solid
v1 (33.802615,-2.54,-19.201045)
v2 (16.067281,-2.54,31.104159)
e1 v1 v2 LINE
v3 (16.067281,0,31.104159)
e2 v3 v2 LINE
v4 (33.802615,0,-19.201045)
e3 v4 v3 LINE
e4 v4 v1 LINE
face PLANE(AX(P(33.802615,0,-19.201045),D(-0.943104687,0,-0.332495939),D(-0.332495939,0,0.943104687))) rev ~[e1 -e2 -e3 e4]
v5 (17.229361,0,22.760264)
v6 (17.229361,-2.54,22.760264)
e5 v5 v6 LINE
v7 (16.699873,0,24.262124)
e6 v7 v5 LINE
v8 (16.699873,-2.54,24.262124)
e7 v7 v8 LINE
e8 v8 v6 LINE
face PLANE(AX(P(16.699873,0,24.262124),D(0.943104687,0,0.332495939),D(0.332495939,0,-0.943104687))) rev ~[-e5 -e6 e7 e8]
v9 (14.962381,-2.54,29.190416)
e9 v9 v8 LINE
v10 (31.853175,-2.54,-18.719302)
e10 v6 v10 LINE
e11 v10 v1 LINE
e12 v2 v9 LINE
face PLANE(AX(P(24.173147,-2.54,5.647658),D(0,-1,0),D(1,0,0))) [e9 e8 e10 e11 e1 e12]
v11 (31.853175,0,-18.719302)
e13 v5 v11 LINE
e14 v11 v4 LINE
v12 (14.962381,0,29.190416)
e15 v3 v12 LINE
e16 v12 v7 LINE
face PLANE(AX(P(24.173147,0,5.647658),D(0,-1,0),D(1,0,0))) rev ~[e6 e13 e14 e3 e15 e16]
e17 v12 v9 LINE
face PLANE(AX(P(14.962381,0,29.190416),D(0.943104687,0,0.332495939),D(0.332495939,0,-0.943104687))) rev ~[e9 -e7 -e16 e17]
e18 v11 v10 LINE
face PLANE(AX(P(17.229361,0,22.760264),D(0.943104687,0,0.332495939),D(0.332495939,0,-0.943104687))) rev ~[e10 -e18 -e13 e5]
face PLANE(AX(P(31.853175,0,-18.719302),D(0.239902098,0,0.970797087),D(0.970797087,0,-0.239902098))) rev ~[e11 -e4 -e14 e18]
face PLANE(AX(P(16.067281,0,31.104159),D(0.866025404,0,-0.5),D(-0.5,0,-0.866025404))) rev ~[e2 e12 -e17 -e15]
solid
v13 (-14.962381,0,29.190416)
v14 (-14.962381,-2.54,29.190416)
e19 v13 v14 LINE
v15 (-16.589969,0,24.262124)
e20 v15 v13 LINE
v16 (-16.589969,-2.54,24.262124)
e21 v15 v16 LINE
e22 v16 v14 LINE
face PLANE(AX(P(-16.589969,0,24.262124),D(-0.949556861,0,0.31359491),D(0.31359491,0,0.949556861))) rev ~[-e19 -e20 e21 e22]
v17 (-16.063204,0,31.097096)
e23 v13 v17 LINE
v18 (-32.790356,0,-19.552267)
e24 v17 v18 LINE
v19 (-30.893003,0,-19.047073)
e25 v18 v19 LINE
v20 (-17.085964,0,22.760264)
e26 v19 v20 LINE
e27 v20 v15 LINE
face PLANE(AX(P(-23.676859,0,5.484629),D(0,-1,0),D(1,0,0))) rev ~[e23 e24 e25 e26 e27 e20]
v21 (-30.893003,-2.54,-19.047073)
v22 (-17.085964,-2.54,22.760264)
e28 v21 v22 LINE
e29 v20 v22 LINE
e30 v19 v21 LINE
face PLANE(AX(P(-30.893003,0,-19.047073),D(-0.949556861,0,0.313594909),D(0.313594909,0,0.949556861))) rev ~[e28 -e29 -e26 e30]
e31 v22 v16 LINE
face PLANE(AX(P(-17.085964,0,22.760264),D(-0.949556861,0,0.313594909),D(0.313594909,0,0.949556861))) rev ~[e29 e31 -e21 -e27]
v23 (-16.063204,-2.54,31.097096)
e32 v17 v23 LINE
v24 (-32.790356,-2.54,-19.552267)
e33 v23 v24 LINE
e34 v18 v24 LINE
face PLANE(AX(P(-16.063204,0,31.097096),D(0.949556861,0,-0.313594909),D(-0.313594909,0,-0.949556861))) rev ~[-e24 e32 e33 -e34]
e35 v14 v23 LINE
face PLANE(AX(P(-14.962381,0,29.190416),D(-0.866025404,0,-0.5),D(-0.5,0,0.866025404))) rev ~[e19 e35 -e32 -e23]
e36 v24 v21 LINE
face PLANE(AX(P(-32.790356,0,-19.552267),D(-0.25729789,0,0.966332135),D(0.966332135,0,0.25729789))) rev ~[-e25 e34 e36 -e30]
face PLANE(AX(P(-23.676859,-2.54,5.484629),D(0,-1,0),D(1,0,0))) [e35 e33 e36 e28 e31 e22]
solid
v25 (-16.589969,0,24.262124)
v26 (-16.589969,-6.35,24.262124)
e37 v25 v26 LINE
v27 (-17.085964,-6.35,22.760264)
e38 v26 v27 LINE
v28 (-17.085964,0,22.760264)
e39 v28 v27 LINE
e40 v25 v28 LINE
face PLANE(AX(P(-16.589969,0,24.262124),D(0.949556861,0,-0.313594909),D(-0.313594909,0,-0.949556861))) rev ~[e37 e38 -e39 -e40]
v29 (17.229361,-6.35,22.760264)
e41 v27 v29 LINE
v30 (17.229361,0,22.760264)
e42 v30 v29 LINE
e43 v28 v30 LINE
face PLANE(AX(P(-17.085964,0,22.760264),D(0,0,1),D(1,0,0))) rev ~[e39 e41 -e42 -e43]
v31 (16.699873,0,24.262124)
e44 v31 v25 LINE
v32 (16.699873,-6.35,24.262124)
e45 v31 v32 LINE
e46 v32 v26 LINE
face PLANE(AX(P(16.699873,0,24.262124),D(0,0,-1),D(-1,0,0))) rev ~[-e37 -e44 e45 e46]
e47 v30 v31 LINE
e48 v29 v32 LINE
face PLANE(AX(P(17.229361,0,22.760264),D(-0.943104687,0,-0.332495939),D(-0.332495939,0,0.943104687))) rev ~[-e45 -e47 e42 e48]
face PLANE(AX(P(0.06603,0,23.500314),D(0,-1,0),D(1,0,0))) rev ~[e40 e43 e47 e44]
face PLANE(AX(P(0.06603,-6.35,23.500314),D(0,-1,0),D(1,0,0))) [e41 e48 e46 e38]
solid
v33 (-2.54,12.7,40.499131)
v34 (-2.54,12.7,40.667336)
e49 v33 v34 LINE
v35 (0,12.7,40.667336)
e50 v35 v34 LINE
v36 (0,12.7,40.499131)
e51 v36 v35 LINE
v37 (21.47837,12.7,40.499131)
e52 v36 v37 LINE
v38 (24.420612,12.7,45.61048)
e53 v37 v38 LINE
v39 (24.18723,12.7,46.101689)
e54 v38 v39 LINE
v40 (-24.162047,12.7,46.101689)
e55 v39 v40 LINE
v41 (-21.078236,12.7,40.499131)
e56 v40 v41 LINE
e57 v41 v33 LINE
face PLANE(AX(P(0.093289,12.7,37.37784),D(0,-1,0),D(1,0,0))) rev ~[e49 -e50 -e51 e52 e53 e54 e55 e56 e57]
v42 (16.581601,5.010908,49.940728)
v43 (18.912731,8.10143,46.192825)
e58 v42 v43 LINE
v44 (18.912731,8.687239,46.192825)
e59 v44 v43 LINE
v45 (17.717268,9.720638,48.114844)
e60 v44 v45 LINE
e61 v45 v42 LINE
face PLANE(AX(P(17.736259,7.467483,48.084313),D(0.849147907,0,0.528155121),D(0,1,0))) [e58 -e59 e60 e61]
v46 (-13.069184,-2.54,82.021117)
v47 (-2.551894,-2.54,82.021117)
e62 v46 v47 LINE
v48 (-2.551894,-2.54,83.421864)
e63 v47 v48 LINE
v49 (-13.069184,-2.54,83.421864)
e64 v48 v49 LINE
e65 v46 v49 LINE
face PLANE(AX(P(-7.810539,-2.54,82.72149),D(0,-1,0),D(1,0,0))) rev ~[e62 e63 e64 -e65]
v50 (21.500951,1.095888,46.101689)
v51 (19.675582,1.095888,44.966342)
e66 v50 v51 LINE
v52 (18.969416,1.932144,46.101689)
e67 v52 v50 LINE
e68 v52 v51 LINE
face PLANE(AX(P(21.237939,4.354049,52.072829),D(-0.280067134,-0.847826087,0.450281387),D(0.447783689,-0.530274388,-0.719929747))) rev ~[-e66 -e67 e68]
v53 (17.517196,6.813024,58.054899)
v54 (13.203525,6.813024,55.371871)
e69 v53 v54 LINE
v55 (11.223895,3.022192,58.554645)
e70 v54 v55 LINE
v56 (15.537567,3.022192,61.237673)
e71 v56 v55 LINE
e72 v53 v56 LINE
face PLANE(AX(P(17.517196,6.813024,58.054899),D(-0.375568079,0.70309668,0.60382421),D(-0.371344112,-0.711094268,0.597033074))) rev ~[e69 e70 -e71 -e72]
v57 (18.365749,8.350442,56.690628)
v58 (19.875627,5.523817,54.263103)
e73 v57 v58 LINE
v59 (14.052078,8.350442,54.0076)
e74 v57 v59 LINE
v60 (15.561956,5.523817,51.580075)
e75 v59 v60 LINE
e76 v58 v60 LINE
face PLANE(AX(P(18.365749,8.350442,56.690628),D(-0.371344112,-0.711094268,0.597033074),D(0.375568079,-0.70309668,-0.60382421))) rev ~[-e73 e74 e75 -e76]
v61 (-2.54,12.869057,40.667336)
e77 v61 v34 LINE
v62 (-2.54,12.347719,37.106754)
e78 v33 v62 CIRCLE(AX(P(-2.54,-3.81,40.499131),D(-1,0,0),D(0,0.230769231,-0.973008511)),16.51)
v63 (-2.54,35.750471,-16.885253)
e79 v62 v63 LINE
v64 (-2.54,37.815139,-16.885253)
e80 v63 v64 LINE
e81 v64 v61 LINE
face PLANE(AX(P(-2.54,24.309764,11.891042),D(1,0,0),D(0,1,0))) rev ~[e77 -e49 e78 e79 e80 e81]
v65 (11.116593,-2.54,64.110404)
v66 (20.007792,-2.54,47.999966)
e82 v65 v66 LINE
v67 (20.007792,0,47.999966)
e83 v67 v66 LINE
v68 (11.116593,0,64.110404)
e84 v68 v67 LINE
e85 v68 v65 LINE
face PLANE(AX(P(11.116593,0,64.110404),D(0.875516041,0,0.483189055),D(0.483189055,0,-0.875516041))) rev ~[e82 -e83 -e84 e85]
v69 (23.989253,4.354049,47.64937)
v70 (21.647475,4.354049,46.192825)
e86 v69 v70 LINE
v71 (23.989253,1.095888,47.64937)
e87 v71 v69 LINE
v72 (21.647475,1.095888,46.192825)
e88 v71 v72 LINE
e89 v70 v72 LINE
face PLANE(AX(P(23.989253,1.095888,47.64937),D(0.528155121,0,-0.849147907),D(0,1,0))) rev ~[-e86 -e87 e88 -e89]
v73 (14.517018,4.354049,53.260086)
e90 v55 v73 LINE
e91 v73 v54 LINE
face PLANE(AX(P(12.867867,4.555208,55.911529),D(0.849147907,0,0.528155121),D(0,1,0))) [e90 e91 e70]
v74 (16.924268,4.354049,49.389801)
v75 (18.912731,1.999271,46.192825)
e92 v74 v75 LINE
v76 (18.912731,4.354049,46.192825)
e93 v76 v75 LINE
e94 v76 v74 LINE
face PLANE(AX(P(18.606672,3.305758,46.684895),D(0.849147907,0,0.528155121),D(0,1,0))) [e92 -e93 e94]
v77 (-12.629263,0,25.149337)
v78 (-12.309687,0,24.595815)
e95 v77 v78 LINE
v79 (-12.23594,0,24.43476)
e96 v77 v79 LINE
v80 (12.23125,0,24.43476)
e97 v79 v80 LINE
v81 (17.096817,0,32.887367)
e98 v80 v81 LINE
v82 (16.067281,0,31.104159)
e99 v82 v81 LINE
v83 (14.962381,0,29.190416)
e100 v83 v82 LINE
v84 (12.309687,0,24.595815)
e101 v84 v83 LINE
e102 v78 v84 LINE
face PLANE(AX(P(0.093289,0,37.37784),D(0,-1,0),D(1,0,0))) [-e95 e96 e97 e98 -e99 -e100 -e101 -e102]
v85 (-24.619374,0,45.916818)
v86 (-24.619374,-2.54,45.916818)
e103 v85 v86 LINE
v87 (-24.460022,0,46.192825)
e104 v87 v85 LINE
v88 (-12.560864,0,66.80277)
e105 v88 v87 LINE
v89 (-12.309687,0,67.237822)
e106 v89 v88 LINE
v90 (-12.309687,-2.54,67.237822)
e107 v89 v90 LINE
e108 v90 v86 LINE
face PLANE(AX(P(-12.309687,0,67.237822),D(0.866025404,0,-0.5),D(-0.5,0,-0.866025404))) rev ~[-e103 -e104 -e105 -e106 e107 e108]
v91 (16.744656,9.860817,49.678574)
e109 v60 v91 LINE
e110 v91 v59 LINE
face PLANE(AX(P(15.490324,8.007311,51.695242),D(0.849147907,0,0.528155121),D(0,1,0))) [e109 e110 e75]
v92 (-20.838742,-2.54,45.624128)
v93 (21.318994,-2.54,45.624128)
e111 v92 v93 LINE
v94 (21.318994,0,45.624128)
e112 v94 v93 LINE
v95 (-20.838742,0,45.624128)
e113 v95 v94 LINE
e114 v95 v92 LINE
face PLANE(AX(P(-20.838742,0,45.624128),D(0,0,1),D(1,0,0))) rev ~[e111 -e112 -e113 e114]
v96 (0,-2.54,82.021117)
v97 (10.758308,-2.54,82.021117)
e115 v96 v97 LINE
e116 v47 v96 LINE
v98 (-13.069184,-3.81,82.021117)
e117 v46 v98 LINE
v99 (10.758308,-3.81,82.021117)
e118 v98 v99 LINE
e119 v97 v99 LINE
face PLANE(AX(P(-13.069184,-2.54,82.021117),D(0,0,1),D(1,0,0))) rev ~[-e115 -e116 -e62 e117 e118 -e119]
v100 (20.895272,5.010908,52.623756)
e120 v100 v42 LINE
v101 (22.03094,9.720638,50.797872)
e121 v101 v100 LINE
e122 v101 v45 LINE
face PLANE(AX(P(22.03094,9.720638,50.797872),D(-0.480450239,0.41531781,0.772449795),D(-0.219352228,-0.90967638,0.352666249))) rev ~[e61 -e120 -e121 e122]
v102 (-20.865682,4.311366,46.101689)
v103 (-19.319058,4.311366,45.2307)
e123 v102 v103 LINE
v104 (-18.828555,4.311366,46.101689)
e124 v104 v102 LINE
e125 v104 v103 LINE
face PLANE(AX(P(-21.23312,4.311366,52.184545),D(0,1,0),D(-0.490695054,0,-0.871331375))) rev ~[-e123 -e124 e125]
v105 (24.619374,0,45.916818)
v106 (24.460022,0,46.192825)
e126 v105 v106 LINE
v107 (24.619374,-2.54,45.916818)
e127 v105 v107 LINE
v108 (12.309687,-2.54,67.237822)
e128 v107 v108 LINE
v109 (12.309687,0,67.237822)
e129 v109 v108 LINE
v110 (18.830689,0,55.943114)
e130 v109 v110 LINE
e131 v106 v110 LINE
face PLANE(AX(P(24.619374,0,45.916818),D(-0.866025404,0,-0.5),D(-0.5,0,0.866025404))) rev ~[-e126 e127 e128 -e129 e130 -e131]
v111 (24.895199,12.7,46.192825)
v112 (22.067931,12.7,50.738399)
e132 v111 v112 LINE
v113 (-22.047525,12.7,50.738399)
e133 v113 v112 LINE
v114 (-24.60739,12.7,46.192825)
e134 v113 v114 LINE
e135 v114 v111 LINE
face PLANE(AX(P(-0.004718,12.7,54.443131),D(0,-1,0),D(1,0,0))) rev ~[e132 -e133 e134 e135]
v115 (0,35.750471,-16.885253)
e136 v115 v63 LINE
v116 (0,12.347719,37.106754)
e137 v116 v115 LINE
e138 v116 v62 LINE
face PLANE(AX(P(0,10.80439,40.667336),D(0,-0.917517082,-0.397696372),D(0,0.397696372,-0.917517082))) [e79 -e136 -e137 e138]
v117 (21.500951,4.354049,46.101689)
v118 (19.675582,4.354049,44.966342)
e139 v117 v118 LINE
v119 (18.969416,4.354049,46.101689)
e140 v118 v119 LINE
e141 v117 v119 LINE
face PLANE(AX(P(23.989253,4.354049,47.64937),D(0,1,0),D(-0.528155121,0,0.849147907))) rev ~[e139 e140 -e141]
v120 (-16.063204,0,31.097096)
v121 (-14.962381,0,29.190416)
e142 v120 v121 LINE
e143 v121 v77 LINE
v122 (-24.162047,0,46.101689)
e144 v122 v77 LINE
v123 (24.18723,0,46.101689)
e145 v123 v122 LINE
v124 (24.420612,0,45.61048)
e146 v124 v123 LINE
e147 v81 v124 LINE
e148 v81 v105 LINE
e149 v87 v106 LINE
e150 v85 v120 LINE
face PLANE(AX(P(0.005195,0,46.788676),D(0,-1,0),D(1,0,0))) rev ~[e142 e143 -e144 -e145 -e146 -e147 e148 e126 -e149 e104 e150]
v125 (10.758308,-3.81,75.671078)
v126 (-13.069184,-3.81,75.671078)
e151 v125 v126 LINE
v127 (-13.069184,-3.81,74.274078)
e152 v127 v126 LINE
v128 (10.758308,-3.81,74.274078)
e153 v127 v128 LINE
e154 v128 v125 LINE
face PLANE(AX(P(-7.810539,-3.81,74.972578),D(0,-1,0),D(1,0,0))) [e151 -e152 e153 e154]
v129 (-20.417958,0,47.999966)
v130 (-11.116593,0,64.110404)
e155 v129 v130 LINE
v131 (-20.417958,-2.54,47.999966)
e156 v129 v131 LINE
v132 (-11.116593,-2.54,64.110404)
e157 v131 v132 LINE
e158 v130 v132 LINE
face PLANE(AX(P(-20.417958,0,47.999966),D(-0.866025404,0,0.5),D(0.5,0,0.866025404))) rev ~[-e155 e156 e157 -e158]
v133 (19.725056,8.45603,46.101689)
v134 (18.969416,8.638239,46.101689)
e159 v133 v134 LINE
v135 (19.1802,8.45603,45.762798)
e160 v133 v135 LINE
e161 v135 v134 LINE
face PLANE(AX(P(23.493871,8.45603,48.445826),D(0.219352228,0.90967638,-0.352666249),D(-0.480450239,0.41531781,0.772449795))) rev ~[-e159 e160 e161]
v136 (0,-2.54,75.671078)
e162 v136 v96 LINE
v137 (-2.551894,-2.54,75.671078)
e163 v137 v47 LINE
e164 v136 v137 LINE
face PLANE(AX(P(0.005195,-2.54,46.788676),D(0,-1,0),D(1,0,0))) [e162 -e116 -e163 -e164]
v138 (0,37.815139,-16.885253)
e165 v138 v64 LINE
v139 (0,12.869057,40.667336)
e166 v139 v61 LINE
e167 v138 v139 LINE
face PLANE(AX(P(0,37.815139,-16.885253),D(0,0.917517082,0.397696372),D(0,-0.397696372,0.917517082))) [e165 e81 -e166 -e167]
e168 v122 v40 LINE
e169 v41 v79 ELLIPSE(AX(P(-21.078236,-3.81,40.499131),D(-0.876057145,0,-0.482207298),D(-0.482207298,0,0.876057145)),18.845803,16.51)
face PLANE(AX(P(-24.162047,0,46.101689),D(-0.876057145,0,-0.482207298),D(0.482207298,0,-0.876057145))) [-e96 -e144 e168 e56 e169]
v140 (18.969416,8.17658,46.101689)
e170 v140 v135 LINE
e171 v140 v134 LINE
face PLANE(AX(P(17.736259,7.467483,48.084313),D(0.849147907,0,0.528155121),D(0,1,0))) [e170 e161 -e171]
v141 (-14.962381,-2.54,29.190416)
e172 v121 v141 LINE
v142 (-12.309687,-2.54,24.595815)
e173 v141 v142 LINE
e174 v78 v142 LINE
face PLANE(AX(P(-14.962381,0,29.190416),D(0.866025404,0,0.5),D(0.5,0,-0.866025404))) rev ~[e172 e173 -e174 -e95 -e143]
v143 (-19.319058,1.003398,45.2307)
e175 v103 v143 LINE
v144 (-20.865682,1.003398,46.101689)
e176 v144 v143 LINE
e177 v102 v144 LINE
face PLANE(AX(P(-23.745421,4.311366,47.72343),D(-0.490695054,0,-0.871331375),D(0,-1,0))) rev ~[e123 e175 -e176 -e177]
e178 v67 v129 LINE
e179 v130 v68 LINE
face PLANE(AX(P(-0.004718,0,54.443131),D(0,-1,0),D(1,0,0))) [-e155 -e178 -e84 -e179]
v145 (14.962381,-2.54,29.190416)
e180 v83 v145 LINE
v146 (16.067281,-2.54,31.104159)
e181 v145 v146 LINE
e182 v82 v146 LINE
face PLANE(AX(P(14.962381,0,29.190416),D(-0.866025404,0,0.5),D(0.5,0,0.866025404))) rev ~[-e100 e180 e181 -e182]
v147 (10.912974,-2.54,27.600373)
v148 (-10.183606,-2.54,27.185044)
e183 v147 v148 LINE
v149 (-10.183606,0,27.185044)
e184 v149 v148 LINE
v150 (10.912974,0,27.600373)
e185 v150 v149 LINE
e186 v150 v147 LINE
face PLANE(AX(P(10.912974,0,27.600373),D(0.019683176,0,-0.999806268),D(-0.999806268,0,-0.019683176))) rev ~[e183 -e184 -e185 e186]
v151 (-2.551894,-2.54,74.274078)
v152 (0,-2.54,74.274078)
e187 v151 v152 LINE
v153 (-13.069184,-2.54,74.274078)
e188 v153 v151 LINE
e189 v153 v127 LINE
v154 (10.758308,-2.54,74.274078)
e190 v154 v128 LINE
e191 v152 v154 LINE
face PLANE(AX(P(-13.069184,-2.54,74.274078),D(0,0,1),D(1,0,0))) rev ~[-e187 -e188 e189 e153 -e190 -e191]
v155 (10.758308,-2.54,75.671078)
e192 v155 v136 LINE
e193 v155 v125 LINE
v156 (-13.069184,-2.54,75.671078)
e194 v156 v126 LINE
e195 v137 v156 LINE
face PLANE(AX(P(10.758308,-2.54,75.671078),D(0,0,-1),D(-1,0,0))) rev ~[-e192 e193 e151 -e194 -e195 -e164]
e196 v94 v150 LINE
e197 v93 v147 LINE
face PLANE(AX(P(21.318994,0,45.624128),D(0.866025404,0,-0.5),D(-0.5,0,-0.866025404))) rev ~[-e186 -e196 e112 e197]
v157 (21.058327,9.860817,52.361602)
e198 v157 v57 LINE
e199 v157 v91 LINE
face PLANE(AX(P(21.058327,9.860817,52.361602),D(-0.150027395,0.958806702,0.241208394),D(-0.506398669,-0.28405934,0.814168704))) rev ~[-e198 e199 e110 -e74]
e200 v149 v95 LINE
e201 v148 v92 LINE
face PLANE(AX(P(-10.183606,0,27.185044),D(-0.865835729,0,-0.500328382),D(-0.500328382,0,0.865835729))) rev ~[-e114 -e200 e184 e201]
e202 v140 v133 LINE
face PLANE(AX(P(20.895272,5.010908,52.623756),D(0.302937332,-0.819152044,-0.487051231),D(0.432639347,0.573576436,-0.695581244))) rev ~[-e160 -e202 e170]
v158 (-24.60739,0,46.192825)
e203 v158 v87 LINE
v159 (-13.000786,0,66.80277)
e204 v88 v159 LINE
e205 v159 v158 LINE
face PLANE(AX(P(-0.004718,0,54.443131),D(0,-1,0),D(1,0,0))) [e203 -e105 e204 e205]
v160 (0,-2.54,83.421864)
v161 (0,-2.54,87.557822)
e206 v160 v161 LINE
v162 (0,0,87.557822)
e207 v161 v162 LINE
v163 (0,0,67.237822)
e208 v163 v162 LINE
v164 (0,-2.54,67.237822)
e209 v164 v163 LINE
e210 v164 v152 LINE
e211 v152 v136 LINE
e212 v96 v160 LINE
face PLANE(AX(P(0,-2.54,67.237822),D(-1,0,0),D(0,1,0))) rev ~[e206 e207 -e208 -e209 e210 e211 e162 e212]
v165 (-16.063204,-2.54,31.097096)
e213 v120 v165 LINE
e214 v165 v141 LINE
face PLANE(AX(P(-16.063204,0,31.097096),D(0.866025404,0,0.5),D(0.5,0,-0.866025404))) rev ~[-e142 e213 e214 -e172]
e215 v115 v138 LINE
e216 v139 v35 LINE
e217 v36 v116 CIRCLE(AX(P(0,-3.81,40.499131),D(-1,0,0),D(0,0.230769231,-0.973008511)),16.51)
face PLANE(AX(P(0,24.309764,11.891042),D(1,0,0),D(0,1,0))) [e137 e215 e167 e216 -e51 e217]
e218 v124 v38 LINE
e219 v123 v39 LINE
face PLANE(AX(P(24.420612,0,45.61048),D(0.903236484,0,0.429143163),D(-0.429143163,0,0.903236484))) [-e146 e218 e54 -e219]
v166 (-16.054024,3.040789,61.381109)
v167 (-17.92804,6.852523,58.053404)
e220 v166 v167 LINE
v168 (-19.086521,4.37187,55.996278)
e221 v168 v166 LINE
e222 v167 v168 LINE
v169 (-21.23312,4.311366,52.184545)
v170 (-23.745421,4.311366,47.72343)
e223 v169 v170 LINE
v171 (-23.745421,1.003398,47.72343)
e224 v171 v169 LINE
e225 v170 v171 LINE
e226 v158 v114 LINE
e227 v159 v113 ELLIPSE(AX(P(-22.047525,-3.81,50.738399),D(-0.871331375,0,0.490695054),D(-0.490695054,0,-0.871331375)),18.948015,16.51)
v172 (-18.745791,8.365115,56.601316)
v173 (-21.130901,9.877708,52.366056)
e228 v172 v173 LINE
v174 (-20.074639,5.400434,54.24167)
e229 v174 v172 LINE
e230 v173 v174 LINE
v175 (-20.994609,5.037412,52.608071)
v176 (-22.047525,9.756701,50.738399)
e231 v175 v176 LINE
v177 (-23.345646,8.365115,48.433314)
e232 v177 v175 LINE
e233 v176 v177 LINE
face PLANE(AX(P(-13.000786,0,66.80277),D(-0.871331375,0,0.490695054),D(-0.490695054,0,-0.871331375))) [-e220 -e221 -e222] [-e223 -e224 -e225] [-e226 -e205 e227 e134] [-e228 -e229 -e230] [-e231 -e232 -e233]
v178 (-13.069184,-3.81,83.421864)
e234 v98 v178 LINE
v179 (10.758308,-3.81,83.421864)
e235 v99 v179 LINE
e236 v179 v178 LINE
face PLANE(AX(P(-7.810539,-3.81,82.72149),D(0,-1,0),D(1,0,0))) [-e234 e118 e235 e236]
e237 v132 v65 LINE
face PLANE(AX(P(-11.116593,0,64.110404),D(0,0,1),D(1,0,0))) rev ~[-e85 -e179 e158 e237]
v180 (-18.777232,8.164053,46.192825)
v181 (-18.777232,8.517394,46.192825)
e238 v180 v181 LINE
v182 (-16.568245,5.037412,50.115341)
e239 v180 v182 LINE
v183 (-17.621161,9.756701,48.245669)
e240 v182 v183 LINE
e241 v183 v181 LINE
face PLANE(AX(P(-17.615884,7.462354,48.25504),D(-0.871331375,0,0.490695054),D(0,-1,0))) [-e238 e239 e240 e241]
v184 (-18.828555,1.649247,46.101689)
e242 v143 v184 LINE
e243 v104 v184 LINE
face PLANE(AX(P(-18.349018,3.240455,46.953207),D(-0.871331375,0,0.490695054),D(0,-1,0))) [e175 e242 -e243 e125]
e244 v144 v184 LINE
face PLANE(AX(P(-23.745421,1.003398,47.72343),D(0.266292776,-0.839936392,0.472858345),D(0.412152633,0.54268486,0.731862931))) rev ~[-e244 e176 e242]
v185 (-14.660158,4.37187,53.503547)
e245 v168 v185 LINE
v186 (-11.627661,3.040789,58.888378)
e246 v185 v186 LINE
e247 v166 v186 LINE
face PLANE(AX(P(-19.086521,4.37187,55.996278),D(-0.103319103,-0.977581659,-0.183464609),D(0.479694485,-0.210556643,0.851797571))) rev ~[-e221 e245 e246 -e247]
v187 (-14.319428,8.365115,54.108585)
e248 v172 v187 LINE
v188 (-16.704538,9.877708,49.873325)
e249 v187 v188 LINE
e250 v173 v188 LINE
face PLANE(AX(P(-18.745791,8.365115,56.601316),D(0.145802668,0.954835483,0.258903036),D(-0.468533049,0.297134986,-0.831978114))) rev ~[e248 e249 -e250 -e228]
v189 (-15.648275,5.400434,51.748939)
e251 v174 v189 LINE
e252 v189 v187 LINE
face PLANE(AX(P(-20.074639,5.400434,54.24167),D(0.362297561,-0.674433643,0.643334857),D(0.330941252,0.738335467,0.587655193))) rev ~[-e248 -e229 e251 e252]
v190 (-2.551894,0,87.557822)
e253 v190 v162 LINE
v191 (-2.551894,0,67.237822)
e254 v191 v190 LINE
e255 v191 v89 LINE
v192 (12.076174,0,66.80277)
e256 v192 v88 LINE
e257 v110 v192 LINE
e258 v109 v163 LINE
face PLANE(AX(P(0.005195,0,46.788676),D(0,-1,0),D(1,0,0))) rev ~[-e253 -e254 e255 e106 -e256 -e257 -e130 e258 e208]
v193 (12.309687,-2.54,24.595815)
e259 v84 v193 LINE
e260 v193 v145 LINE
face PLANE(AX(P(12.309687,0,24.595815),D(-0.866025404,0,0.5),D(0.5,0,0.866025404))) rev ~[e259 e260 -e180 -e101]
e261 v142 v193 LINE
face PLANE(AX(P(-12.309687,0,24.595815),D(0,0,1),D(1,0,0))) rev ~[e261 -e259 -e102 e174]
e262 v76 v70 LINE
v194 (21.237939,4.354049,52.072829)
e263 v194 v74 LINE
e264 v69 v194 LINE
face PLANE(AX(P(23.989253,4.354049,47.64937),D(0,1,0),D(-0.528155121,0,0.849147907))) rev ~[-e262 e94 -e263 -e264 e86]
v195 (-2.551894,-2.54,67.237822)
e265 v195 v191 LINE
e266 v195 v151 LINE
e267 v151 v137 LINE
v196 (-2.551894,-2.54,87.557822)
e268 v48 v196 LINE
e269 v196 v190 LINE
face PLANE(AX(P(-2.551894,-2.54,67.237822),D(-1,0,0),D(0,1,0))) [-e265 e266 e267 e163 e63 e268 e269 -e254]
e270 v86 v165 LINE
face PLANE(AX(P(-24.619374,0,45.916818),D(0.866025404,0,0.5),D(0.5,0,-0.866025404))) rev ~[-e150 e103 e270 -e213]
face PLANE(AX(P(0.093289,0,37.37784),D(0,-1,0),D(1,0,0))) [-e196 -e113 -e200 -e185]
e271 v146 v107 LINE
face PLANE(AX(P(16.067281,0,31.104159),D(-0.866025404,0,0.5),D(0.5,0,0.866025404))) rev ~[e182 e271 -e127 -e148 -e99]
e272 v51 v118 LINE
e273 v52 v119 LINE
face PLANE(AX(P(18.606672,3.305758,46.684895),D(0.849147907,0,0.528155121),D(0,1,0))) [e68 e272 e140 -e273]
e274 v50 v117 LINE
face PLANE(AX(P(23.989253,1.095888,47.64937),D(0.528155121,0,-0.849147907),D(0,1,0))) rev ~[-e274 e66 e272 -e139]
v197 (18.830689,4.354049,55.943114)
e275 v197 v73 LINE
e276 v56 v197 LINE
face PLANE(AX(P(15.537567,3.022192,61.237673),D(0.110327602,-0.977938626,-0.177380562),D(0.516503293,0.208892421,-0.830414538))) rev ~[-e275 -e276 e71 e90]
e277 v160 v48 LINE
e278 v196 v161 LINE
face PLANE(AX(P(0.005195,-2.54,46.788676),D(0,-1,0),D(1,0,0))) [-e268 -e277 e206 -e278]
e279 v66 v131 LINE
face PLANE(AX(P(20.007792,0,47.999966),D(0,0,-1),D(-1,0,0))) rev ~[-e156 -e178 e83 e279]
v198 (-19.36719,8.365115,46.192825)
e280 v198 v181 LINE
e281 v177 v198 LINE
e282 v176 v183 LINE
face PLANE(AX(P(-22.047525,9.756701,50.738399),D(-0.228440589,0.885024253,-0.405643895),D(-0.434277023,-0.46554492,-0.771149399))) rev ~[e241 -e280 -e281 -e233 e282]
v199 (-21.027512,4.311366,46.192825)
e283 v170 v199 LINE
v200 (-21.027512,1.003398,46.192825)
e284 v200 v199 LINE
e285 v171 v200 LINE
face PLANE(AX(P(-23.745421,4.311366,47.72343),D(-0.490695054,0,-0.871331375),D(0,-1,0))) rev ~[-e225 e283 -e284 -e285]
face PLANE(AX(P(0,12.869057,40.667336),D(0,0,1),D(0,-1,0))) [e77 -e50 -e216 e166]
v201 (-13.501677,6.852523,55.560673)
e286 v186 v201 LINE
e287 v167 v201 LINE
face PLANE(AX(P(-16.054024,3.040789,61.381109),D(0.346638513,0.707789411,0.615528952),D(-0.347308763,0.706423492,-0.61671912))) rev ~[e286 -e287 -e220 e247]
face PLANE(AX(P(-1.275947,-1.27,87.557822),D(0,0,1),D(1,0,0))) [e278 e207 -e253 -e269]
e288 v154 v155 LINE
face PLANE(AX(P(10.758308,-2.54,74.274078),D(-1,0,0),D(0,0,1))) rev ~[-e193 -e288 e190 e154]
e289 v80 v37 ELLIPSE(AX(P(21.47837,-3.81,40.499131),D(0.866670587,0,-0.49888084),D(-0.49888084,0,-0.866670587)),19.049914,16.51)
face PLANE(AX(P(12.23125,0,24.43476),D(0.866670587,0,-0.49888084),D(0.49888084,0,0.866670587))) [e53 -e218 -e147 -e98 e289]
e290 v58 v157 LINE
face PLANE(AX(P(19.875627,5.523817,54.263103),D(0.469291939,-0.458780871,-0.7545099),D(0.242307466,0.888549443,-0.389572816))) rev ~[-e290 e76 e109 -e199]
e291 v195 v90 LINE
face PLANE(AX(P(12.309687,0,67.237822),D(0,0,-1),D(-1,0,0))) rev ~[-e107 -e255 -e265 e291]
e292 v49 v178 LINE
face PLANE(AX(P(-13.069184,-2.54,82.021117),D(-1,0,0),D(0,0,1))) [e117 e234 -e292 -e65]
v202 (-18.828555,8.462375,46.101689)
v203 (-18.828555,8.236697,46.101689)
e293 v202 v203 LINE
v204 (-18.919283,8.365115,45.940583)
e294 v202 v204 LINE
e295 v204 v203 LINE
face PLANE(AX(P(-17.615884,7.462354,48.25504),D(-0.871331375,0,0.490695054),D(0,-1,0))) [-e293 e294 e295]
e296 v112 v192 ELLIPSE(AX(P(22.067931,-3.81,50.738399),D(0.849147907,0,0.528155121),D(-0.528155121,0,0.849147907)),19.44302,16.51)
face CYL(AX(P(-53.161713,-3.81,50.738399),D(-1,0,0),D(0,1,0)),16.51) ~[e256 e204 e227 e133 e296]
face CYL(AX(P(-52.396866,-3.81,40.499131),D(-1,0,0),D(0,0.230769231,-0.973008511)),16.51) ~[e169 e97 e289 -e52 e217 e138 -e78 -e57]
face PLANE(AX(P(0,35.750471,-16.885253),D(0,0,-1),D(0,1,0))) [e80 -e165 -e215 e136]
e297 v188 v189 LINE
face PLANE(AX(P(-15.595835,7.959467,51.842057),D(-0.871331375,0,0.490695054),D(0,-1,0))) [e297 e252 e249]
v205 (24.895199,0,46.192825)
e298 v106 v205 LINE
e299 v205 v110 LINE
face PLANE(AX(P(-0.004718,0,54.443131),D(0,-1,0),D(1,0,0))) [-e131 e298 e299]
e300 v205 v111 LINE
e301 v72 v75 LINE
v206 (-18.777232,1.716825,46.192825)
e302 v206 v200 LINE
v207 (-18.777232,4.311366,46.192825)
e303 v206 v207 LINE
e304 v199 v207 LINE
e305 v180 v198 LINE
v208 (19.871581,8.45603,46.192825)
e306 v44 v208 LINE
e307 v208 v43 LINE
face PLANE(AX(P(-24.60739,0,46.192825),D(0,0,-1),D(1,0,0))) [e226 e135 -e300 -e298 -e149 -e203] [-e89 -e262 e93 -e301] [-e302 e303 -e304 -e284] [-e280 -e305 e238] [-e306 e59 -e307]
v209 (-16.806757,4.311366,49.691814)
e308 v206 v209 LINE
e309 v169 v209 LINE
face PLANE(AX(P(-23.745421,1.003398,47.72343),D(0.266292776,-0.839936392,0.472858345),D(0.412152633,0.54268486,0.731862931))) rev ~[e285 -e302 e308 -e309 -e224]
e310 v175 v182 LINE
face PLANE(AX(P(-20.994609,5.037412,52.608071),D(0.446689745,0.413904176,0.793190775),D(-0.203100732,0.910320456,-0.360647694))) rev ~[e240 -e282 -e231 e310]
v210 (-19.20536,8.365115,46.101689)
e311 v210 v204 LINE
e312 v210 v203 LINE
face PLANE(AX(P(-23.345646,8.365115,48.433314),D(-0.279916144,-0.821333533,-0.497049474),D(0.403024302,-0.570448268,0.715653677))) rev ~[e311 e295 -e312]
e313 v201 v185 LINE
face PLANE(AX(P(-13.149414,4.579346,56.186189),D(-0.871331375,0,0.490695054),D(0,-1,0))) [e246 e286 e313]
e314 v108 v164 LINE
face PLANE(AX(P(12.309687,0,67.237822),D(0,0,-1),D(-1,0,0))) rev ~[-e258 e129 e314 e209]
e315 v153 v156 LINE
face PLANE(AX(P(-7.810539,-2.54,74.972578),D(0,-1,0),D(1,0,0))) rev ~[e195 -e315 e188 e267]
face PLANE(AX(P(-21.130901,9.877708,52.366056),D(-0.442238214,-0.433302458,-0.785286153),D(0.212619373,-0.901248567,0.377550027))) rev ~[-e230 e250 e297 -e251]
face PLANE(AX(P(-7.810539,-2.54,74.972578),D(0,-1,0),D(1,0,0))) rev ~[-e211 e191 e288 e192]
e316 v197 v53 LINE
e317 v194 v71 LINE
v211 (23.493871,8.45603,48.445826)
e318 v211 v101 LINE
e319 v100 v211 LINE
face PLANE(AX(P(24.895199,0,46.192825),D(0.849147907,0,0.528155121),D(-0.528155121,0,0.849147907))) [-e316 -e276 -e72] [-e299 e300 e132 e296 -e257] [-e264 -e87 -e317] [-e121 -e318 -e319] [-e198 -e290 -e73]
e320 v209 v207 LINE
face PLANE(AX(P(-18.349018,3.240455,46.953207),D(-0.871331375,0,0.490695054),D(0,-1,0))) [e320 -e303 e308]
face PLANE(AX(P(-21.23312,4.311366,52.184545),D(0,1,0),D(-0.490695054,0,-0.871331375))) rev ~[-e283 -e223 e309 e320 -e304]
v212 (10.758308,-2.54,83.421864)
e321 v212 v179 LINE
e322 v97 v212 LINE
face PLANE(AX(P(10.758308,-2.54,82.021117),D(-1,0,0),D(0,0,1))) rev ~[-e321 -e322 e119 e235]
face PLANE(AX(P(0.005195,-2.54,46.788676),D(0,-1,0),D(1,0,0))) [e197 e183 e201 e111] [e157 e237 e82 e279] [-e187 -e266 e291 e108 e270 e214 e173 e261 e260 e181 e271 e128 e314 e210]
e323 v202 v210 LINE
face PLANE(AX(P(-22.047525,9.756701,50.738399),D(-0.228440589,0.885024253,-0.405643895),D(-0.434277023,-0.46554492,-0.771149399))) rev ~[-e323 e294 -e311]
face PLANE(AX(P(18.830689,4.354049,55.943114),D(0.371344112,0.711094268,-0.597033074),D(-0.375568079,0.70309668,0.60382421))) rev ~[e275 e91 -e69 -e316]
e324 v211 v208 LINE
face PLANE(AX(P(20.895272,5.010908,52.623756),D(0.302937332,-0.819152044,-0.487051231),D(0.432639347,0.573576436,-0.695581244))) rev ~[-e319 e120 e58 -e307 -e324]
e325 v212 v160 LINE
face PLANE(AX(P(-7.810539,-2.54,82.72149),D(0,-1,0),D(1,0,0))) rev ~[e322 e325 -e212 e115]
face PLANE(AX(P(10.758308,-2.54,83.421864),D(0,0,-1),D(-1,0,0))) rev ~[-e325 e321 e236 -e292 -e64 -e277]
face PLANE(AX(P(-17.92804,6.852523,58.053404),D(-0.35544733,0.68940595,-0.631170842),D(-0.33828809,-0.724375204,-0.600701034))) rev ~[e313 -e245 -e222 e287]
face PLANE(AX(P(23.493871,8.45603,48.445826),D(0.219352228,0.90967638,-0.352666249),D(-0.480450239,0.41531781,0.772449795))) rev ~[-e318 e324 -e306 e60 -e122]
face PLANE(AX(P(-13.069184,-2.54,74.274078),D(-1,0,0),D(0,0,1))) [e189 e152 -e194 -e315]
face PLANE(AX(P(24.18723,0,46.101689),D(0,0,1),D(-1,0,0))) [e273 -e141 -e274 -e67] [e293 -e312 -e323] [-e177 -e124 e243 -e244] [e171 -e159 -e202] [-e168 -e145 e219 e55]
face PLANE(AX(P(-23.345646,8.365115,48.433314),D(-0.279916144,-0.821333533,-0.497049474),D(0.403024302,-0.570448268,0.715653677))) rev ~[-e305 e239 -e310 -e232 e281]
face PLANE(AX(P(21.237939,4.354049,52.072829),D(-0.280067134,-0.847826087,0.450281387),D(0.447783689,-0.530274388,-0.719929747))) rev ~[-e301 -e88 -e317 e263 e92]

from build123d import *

# Parameters (mm, degrees)
F1_DEPTH    = 2.54
F2_DEPTH    = 6.35
F3_DEPTH    = 2.54
F5_DEPTH    = 12.7
F6_T1_DEPTH = 64.7979646342
F6_T3_DEPTH = 40.6008481475
F8_DEPTH    = 12.7
F9_T1_DEPTH = 104.7890423645
F12_DEPTH   = 2.54
F13_DEPTH   = 5.08
F14_DEPTH   = 5.08
F16_DEPTH   = 2.54
F17_W       = 2.5518944021
F17_H       = 2.54
F18_DEPTH   = 20.32
F19_W       = 10.5172891635
F19_H       = 1.4007464051
F19_W_2     = 10.7583077624
F19_W_3     = 2.5518944021
F19_H_2     = 1.397
F20_DEPTH   = 1.27


# Not quite as in the source:
# - a fillet or chamfer that OpenCascade refuses, or shapes differently, is made with other operations: its cross-section is extruded or revolved along the edge and cut away or added
# - a feature names something its author has since deleted; it is built from what else it names


with BuildPart() as f1:
    # F0 (on Front) → F1 (new body)
    with BuildSketch(Plane.XZ):
        Polygon((-12.3096870905, 24.5958147295), (12.3096870905, 24.5958147295), (14.9623812482, 29.1904157876), (16.0672812482, 31.1041587249), (24.619374181, 45.9168181956), (12.3096870905, 67.2378216616), (-12.3096870905, 67.2378216616), (-24.619374181, 45.9168181956), (-16.063203778, 31.0970963393), (-14.9623812482, 29.1904157876), align=None)
        Polygon((-20.4179584605, 47.9999661041), (-11.1165930793, 64.1104035241), (11.1165930793, 64.1104035241), (20.0077917219, 47.9999661041), (21.3189943773, 45.6241280226), (10.9129743139, 27.6003725681), (-10.1836063763, 27.1850443882), (-20.8387417213, 45.6241280226), (-21.3144036201, 46.4472775415), align=None, mode=Mode.SUBTRACT)
    extrude(amount=F1_DEPTH)

    # F0 (on Front) → F3 (join)
    with BuildSketch(Plane.XZ):
        Polygon((20.0077917219, 47.9999661041), (-20.4179584605, 47.9999661041), (-21.3144036201, 46.4472775415), (-20.8387417213, 45.6241280226), (21.3189943773, 45.6241280226), align=None)
    extrude(amount=F3_DEPTH)

    # F4 (on Front) → F5 (join)
    with BuildSketch(Plane.XZ):
        Polygon((-24.6073901653, 46.1928248405), (24.8951986432, 46.1928248405), (12.076173909, 66.8027698994), (-13.0007863045, 66.8027698994), align=None)
    extrude(amount=-F5_DEPTH)

    # F6: fillet of radius 16.51 on 1 edges, made by hand

    # F6_s2 → F6_t1 (cut)
    with BuildSketch(Plane.YZ.offset(-12.5608644411)):
        with BuildLine():
            ThreePointArc((12.7, 50.7383993857), (9.1415095645, 60.9774667261), (0, 66.8027698994))
            Line((0, 66.8027698994), (12.7, 66.8027698994))
            Line((12.7, 66.8027698994), (12.7, 50.7383993857))
        make_face()
    extrude(amount=F6_T1_DEPTH, mode=Mode.SUBTRACT)

    # F6_s4 → F6_t3 (cut)
    with BuildSketch(Plane.YZ.offset(-53.1617125886)):
        with BuildLine():
            ThreePointArc((12.7, 50.7383993857), (9.1415095645, 60.9774667261), (0, 66.8027698994))
            Line((0, 66.8027698994), (12.7, 66.8027698994))
            Line((12.7, 66.8027698994), (12.7, 50.7383993857))
        make_face()
    extrude(amount=F6_T3_DEPTH, mode=Mode.SUBTRACT)

    # F7 (on face) → F8 (join)
    with BuildSketch(Plane.XZ):
        Polygon((24.1872295737, 46.1016893387), (-24.1620466113, 46.1016893387), (-12.2359395027, 24.4347602129), (12.2312502936, 24.4347602129), (24.4206115603, 45.6104800105), align=None)
    extrude(amount=-F8_DEPTH)

    # F9: fillet of radius 16.51 on 1 edges, made by hand

    # F9_s2 → F9_t1 (cut)
    with BuildSketch(Plane.YZ.offset(-52.3968657869)):
        with BuildLine():
            ThreePointArc((0, 24.4347602129), (9.1415095645, 30.2600633862), (12.7, 40.4991307266))
            Line((12.7, 40.4991307266), (12.7, 24.4347602129))
            Line((12.7, 24.4347602129), (0, 24.4347602129))
        make_face()
    extrude(amount=F9_T1_DEPTH, mode=Mode.SUBTRACT)

    # F11 (on face) + F10 (on face) → F13 (cut)
    with BuildSketch(Plane(origin=(-38.4324941113, 0, 21.6434703373), x_dir=(0, -1, 0), z_dir=(-0.8713313746, 0, 0.4906950536))):
        Polygon((-4.3718703091, 39.4256524742), (-3.040788928, 45.6056557596), (-6.8525229581, 41.7865514755), align=None)
        Polygon((-5.4004341364, 37.411943078), (-8.3651151508, 40.1200354099), (-9.8777078092, 35.2593585849), align=None)
        Polygon((-5.0374120474, 35.5371125042), (-9.7567010671, 33.3913478812), (-8.3651151508, 30.7458732277), align=None)
        Polygon((-1.0033984436, 29.9311615527), (-4.3113664724, 35.0510440767), (-4.3113664724, 29.9311615527), align=None)
    with BuildSketch(Plane(origin=(38.6673789122, 0, 24.0504322194), x_dir=(0, 1, 0), z_dir=(0.8491479072, 0, 0.5281551209))):
        Polygon((6.8130241707, 40.0453992188), (3.022192046, 43.7935963273), (4.3540487314, 37.5584534102), align=None)
        Polygon((4.3540487314, 27.7913156897), (4.3540487314, 33.0006070435), (1.0958878556, 27.7913156897), align=None)
        Polygon((9.7206383943, 31.4991533315), (5.0109082768, 33.6494068058), (8.4560297574, 28.7292634302), align=None)
        Polygon((9.860817343, 33.3406813443), (8.3504421636, 38.4387634695), (5.5238169231, 35.5799859143), align=None)
    extrude(amount=-F13_DEPTH, dir=(-0.8713313746, 0, 0.4906950536), mode=Mode.SUBTRACT)

    # F10 (on face) → F14 (cut)
    with BuildSketch(Plane(origin=(38.6673789122, 0, 24.0504322194), x_dir=(0, 1, 0), z_dir=(0.8491479072, 0, 0.5281551209))):
        Polygon((9.860817343, 33.3406813443), (8.3504421636, 38.4387634695), (5.5238169231, 35.5799859143), align=None)
        Polygon((9.7206383943, 31.4991533315), (5.0109082768, 33.6494068058), (8.4560297574, 28.7292634302), align=None)
        Polygon((4.3540487314, 27.7913156897), (4.3540487314, 33.0006070435), (1.0958878556, 27.7913156897), align=None)
        Polygon((6.8130241707, 40.0453992188), (3.022192046, 43.7935963273), (4.3540487314, 37.5584534102), align=None)
    extrude(amount=-F14_DEPTH, mode=Mode.SUBTRACT)

    # F15 (on Right) → F16 (join)
    with BuildSketch(Plane.YZ):
        Polygon((37.8151386976, -16.8852526695), (12.8690572456, 40.6673364341), (10.8043896034, 40.6673364341), (35.7504710555, -16.8852526695), align=None)
    extrude(amount=-F16_DEPTH)

    # F17 (on face) → F18 (join)
    with BuildSketch(Plane.XY.offset(67.2378216616)):
        with Locations((-1.2759472011, -1.27)):
            Rectangle(F17_W, F17_H)
    extrude(amount=F18_DEPTH)

    # F19 (on face) → F20 (join)
    with BuildSketch(Plane.XZ.offset(2.54)):
        with Locations((-7.8105389839, 82.721490413)):
            Rectangle(F19_W, F19_H)
        with Locations((5.3791538812, 82.721490413)):
            Rectangle(F19_W_2, F19_H)
        with Locations((-1.2759472011, 82.721490413)):
            Rectangle(F19_W_3, F19_H)
        with Locations((-7.8105389839, 74.9725780115)):
            Rectangle(F19_W, F19_H_2)
        with Locations((-1.2759472011, 74.9725780115)):
            Rectangle(F19_W_3, F19_H_2)
        with Locations((5.3791538812, 74.9725780115)):
            Rectangle(F19_W_2, F19_H_2)
    extrude(amount=F20_DEPTH)


with BuildPart() as f2:
    # F0 (on Front) → F2 (new body)
    with BuildSketch(Plane.XZ):
        Polygon((17.2293611918, 22.7602638308), (16.6998734149, 24.2621239926), (-16.5899691079, 24.2621239926), (-17.085964367, 22.7602638308), align=None)
    extrude(amount=F2_DEPTH)


with BuildPart() as f12:
    # F0 (on Front) → F12 (new body)
    with BuildSketch(Plane.XZ):
        Polygon((-16.5899691079, 24.2621239926), (-14.9623812482, 29.1904157876), (-16.063203778, 31.0970963393), (-32.79035625, -19.5522666397), (-30.8930026501, -19.0470727638), (-17.085964367, 22.7602638308), align=None)
    extrude(amount=F12_DEPTH)


with BuildPart() as f12b:
    # F0 (on Front) → F12, piece 2 (new body)
    with BuildSketch(Plane.XZ):
        Polygon((16.0672812482, 31.1041587249), (14.9623812482, 29.1904157876), (16.6998734149, 24.2621239926), (17.2293611918, 22.7602638308), (31.85317493, -18.7193023163), (33.8026146141, -19.2010452842), align=None)
    extrude(amount=F12_DEPTH)


solid = Compound([f1.part, f2.part, f12.part, f12b.part])
